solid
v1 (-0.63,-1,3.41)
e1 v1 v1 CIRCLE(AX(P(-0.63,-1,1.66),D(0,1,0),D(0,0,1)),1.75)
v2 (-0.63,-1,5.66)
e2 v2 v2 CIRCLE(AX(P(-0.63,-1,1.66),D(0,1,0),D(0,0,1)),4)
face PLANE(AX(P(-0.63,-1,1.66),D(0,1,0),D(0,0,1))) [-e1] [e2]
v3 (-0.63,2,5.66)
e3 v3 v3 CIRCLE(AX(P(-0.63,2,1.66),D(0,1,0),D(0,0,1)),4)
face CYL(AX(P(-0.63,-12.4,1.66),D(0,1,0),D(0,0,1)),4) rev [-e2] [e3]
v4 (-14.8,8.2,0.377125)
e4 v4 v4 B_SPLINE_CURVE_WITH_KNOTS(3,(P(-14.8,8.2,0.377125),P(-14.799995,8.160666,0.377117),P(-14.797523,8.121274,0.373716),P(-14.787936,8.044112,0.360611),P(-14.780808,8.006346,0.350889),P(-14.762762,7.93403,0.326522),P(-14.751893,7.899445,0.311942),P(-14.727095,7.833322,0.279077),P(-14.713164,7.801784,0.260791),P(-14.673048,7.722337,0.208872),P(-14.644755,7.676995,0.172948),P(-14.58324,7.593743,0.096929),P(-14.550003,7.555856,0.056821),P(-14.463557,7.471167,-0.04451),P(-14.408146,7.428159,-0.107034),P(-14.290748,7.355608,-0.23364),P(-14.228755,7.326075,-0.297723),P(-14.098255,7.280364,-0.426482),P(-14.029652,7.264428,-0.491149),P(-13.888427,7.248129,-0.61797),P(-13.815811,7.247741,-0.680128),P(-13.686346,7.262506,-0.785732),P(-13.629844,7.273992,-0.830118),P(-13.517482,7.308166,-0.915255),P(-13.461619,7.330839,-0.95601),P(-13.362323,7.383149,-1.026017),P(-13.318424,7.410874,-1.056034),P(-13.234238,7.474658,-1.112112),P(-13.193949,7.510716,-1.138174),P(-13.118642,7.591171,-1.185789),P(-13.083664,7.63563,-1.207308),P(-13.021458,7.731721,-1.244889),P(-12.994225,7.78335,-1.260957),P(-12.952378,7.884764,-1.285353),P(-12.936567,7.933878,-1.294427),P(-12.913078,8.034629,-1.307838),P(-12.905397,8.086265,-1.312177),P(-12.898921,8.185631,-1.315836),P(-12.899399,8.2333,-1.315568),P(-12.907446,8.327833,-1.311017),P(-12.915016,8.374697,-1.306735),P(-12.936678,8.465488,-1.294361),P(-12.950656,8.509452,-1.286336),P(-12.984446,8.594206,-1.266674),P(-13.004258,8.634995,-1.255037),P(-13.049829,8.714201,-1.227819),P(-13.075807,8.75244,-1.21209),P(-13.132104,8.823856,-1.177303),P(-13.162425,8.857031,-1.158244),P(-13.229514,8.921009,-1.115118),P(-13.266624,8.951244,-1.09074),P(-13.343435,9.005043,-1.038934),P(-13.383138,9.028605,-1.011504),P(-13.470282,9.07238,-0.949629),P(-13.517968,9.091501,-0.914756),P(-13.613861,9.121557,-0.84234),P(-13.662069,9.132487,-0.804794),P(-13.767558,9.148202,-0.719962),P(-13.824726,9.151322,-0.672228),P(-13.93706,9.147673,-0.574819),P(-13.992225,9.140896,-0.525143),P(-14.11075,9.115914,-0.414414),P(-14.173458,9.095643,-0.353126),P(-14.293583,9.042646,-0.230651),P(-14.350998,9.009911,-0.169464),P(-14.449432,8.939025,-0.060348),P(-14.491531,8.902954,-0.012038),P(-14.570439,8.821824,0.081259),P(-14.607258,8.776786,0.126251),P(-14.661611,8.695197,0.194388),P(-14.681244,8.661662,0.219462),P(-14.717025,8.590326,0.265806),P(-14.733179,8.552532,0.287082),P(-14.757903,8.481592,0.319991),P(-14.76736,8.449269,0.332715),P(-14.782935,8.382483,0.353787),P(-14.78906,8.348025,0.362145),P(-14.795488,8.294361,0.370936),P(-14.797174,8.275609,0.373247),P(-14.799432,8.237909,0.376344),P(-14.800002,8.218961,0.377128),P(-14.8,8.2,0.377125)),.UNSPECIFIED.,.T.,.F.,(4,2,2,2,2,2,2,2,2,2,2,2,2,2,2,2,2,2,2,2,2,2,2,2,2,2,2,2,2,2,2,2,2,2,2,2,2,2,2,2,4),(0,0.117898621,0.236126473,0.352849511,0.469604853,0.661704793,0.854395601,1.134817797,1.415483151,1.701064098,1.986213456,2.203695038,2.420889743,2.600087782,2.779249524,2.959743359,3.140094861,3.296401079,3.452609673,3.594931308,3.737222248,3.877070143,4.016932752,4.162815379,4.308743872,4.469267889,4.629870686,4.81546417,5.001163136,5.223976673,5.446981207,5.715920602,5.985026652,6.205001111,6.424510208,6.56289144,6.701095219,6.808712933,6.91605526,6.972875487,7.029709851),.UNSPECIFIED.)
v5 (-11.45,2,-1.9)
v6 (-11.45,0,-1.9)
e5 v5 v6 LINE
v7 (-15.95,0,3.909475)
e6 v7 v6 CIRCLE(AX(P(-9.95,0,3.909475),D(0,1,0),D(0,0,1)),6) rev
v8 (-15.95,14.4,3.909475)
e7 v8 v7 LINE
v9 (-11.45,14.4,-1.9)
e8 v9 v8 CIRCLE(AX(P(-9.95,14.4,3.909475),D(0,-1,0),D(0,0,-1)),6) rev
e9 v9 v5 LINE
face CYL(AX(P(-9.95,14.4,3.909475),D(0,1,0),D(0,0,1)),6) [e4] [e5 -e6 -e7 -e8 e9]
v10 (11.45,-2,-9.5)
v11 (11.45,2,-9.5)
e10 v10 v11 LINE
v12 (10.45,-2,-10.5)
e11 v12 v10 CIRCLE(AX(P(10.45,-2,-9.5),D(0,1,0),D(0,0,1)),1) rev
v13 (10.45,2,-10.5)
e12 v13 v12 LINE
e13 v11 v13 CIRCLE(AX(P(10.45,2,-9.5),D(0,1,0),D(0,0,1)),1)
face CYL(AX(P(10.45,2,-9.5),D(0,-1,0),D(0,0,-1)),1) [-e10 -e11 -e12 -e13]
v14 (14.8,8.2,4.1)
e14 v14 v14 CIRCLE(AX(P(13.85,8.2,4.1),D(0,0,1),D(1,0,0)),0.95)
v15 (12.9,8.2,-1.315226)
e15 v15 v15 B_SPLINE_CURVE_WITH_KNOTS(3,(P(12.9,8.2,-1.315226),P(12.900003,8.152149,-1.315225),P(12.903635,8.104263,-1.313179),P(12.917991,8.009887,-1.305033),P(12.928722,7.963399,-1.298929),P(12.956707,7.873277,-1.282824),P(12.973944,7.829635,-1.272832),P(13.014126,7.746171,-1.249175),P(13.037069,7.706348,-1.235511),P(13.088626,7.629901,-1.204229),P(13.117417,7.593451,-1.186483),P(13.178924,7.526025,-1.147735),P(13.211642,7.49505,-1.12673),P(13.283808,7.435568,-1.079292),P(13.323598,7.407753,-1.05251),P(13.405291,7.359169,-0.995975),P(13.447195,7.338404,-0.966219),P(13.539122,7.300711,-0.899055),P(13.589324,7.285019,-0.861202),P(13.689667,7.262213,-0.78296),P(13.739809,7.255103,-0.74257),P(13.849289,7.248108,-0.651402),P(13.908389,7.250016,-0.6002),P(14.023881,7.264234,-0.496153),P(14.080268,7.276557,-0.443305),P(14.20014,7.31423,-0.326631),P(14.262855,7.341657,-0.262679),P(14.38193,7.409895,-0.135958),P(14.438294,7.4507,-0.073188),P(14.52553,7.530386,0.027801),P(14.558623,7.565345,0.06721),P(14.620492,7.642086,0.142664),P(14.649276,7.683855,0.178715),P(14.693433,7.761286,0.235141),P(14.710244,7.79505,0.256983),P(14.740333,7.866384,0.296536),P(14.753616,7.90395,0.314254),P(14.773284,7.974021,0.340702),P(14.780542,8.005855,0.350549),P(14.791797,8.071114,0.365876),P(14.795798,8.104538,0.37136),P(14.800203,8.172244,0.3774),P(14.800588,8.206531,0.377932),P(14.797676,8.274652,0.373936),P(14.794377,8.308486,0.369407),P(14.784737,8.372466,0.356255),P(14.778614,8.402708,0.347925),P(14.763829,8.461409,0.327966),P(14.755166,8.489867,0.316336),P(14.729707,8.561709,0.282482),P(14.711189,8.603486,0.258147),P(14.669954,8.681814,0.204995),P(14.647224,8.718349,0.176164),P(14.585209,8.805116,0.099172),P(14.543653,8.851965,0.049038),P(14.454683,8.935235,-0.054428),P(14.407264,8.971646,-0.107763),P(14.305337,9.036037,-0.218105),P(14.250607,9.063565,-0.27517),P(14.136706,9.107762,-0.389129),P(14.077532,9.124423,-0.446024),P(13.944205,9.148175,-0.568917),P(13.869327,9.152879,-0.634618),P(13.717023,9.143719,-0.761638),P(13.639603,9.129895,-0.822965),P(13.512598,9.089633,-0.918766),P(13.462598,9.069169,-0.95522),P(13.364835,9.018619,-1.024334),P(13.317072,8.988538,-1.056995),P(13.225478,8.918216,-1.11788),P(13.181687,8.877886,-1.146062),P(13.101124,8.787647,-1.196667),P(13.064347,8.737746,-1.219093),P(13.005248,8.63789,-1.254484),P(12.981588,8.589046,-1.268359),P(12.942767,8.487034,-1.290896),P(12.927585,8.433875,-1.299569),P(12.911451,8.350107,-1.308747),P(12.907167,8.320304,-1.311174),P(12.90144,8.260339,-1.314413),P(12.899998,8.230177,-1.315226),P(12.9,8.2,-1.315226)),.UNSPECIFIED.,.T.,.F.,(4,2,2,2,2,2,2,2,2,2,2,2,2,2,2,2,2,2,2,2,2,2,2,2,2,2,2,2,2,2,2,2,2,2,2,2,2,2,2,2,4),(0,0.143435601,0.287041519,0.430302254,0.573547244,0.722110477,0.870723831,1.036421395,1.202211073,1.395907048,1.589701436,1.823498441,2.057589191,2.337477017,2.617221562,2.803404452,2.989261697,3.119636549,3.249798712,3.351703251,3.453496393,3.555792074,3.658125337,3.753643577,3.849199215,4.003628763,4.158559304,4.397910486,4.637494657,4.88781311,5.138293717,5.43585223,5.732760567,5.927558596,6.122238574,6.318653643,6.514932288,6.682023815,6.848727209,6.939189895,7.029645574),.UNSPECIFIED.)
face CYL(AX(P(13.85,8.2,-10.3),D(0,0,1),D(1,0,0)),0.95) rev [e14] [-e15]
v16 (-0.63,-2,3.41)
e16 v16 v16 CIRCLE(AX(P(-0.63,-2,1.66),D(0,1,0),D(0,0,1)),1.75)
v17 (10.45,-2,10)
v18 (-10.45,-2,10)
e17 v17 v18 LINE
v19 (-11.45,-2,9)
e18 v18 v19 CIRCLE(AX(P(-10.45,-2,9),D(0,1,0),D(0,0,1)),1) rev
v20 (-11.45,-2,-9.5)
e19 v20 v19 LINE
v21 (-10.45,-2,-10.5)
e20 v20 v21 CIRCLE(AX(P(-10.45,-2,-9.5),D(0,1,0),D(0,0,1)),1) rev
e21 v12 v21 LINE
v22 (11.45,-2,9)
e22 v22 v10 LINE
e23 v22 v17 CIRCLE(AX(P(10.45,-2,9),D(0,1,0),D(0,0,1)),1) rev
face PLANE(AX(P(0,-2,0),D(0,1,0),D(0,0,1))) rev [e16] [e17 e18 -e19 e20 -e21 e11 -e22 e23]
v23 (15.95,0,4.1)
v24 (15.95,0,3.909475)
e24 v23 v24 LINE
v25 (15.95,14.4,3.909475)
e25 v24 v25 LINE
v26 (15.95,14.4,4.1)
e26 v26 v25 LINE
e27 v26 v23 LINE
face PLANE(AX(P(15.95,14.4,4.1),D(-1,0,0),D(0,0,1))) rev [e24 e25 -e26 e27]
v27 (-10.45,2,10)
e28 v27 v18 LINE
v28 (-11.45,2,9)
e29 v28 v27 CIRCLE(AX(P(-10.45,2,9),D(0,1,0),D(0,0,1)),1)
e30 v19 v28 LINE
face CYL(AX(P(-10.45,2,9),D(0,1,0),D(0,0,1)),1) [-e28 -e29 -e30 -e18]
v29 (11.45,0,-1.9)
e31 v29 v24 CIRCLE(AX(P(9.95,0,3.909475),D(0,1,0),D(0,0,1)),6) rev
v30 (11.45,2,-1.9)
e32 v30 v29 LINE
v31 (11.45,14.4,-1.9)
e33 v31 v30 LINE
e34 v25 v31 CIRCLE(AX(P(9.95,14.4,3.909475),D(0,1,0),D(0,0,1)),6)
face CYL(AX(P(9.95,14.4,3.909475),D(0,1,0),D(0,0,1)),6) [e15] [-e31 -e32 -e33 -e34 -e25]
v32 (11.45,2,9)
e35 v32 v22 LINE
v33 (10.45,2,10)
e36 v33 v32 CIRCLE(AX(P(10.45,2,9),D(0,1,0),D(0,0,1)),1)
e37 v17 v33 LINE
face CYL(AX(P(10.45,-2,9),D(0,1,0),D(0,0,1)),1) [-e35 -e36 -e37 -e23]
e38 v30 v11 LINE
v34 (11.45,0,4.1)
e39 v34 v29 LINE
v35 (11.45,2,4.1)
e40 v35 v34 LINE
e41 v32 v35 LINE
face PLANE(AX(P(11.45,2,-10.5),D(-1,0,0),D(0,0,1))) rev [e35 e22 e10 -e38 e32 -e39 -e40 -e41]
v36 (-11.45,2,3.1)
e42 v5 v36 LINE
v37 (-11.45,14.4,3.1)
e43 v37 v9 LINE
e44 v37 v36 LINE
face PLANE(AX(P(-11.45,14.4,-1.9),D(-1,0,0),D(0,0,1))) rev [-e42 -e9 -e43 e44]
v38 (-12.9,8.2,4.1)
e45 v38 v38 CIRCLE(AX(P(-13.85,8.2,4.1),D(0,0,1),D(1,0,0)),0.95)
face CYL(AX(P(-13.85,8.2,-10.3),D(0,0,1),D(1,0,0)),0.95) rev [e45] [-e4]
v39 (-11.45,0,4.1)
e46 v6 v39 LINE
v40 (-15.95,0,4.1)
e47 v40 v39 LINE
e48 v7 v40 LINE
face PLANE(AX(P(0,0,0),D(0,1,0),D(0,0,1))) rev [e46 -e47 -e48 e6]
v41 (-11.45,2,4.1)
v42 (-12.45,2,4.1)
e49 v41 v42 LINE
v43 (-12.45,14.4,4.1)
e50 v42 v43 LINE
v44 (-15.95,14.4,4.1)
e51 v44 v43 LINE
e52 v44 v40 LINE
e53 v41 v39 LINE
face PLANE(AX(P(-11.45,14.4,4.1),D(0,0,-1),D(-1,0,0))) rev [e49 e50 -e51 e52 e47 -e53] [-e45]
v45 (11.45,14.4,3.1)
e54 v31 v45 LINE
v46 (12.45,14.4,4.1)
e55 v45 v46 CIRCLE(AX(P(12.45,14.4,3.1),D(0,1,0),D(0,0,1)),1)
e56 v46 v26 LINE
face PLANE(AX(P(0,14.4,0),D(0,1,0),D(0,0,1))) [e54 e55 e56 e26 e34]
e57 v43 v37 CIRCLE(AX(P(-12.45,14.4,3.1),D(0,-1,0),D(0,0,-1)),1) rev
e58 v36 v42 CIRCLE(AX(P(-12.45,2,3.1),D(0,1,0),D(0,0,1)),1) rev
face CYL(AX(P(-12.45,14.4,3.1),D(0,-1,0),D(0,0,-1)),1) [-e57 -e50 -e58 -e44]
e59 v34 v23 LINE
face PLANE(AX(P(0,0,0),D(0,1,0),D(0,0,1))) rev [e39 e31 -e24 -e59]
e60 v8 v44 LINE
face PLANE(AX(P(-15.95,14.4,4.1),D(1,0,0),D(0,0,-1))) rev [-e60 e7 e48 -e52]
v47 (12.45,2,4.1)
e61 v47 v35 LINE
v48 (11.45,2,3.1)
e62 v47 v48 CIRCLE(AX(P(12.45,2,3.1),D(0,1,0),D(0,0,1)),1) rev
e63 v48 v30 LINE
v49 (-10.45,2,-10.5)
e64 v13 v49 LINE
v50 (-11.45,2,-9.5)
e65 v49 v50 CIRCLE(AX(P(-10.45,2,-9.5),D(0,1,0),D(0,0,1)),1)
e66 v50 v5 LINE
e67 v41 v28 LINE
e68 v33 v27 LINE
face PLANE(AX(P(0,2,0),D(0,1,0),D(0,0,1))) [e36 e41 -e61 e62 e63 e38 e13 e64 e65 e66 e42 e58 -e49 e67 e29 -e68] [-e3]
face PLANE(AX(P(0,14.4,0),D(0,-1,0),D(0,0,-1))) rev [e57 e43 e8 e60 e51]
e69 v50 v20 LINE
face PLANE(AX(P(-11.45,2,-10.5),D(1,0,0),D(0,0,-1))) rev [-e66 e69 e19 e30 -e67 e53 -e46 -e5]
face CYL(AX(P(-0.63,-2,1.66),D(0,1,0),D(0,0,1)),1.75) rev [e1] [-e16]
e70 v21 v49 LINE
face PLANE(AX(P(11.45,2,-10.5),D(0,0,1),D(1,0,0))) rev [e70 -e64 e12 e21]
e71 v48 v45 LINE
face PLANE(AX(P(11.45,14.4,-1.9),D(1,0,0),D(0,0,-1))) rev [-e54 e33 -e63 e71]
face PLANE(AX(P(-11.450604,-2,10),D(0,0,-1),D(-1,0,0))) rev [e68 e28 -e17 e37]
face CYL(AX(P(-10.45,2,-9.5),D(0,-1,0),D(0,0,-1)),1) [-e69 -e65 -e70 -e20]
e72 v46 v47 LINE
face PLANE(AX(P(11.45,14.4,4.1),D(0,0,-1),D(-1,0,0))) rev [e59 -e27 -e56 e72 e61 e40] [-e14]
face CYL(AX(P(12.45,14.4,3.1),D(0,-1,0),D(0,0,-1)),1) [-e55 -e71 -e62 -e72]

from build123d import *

# Parameters (mm, degrees)
SKETCH_1_W          = 22.9
SKETCH_1_H          = 21
EXTRUDE_1_DEPTH     = 2
SKETCH_2_W          = 4.5
SKETCH_2_H          = 6
EXTRUDE_2_DEPTH     = 14.4
FILLET_1_R          = 1
SKETCH_3_R          = 4
CUT_EXTRUDE_1_DEPTH = 14.4
SKETCH_5_R          = 0.95
CUT_EXTRUDE_2_DEPTH = 14.4
SKETCH_1_2_W        = 22.9
SKETCH_1_2_H        = 21
EXTRUDE_3_DEPTH     = 2
SKETCH_6_R          = 4
CUT_EXTRUDE_3_DEPTH = 1
SKETCH_7_R          = 1.75
CUT_EXTRUDE_4_DEPTH = 1
FILLET_2_R          = 1
SKETCH_9_W          = 22.900603658
SKETCH_9_H          = 0.5
CUT_EXTRUDE_5_DEPTH = 4
FILLET_4_R          = 1
FILLET_5_DEPTH      = 14.4


with BuildPart() as part:
    # 草图1 → 凸台-拉伸1 (new body)
    with BuildSketch(Plane(origin=(0, 0, 0), x_dir=(1, 0, 0), z_dir=(0, 1, 0))):
        Rectangle(SKETCH_1_W, SKETCH_1_H)
    extrude(amount=EXTRUDE_1_DEPTH)

    # 草图2 → 凸台-拉伸2 (add)
    with BuildSketch(Plane(origin=(0, 0, 0), x_dir=(1, 0, 0), z_dir=(0, 1, 0))):
        with Locations((-13.7, -1.1)):
            Rectangle(SKETCH_2_W, SKETCH_2_H)
        with Locations((13.7, -1.1)):
            Rectangle(SKETCH_2_W, SKETCH_2_H)
    extrude(amount=EXTRUDE_2_DEPTH)

    # 圆角1
    fillet_1_edges = [part.edges().sort_by_distance(p)[0] for p in [
        (-11.45, 8.2, 4.1),
        (11.45, 8.2, 4.1),
    ]]
    fillet(fillet_1_edges, radius=FILLET_1_R)

    # 草图3 → 切除-拉伸1 (cut)
    with BuildSketch(Plane(origin=(0, 2, 0), x_dir=(1, 0, 0), z_dir=(0, 1, 0))):
        with Locations(Location((-0.63, -1.66, 0), (0, 0, 270))):
            Circle(SKETCH_3_R)
    extrude(amount=-CUT_EXTRUDE_1_DEPTH, mode=Mode.SUBTRACT)

    # 草图5 → 切除-拉伸2 (cut)
    with BuildSketch(Plane.XY.offset(4.1)):
        with Locations((-13.85, 8.2)):
            Circle(SKETCH_5_R)
        with Locations((13.85, 8.2)):
            Circle(SKETCH_5_R)
    extrude(amount=-CUT_EXTRUDE_2_DEPTH, mode=Mode.SUBTRACT)

    # 草图1<2> → 凸台-拉伸3 (add)
    with BuildSketch(Plane(origin=(0, 0, 0), x_dir=(1, 0, 0), z_dir=(0, 1, 0))):
        Rectangle(SKETCH_1_2_W, SKETCH_1_2_H)
    extrude(amount=-EXTRUDE_3_DEPTH)

    # 草图6 → 切除-拉伸3 (cut)
    with BuildSketch(Plane(origin=(0, 0, 0), x_dir=(1, 0, 0), z_dir=(0, 1, 0))):
        with Locations(Location((-0.63, -1.66, 0), (0, 0, 270))):
            Circle(SKETCH_6_R)
    extrude(amount=-CUT_EXTRUDE_3_DEPTH, mode=Mode.SUBTRACT)

    # 草图7 → 切除-拉伸4 (cut)
    with BuildSketch(Plane(origin=(0, -1, 0), x_dir=(1, 0, 0), z_dir=(0, 1, 0))):
        with Locations(Location((-0.63, -1.66, 0), (0, 0, 270))):
            Circle(SKETCH_7_R)
    extrude(amount=-CUT_EXTRUDE_4_DEPTH, mode=Mode.SUBTRACT)

    # 圆角2
    fillet_2_edges = [part.edges().sort_by_distance(p)[0] for p in [
        (11.45, 0, -10.5),
        (-11.45, 0, -10.5),
    ]]
    fillet(fillet_2_edges, radius=FILLET_2_R)

    # 草图9 → 切除-拉伸5 (cut)
    with BuildSketch(Plane(origin=(0, 2, 0), x_dir=(1, 0, 0), z_dir=(0, 1, 0))):
        with Locations((-0.000301829, -10.25)):
            Rectangle(SKETCH_9_W, SKETCH_9_H)
    extrude(amount=-CUT_EXTRUDE_5_DEPTH, mode=Mode.SUBTRACT)

    # 圆角4
    fillet_4_edges = [part.edges().sort_by_distance(p)[0] for p in [
        (-11.45, 0, 10),
        (11.45, 0, 10),
    ]]
    fillet(fillet_4_edges, radius=FILLET_4_R)

    # 圆角5: read off the stored shape, not the designer's step
    # 圆角5 outline → 圆角5 (cut)
    with BuildSketch(Plane(origin=(0, 0, 0), x_dir=(1, 0, 0), z_dir=(0, 1, 0))):
        with BuildLine():
            ThreePointArc((11.45, 1.9), (14.69341649, -0.235240405), (15.95, -3.909475019))
            Line((15.95, -3.909475019), (15.95, 1.9))
            Line((15.95, 1.9), (11.45, 1.9))
        make_face()
        with BuildLine():
            ThreePointArc((-15.95, -3.909475019), (-14.69341649, -0.235240405), (-11.45, 1.9))
            Line((-11.45, 1.9), (-15.95, 1.9))
            Line((-15.95, 1.9), (-15.95, -3.909475019))
        make_face()
    extrude(amount=FILLET_5_DEPTH, mode=Mode.SUBTRACT)


solid = part.part
